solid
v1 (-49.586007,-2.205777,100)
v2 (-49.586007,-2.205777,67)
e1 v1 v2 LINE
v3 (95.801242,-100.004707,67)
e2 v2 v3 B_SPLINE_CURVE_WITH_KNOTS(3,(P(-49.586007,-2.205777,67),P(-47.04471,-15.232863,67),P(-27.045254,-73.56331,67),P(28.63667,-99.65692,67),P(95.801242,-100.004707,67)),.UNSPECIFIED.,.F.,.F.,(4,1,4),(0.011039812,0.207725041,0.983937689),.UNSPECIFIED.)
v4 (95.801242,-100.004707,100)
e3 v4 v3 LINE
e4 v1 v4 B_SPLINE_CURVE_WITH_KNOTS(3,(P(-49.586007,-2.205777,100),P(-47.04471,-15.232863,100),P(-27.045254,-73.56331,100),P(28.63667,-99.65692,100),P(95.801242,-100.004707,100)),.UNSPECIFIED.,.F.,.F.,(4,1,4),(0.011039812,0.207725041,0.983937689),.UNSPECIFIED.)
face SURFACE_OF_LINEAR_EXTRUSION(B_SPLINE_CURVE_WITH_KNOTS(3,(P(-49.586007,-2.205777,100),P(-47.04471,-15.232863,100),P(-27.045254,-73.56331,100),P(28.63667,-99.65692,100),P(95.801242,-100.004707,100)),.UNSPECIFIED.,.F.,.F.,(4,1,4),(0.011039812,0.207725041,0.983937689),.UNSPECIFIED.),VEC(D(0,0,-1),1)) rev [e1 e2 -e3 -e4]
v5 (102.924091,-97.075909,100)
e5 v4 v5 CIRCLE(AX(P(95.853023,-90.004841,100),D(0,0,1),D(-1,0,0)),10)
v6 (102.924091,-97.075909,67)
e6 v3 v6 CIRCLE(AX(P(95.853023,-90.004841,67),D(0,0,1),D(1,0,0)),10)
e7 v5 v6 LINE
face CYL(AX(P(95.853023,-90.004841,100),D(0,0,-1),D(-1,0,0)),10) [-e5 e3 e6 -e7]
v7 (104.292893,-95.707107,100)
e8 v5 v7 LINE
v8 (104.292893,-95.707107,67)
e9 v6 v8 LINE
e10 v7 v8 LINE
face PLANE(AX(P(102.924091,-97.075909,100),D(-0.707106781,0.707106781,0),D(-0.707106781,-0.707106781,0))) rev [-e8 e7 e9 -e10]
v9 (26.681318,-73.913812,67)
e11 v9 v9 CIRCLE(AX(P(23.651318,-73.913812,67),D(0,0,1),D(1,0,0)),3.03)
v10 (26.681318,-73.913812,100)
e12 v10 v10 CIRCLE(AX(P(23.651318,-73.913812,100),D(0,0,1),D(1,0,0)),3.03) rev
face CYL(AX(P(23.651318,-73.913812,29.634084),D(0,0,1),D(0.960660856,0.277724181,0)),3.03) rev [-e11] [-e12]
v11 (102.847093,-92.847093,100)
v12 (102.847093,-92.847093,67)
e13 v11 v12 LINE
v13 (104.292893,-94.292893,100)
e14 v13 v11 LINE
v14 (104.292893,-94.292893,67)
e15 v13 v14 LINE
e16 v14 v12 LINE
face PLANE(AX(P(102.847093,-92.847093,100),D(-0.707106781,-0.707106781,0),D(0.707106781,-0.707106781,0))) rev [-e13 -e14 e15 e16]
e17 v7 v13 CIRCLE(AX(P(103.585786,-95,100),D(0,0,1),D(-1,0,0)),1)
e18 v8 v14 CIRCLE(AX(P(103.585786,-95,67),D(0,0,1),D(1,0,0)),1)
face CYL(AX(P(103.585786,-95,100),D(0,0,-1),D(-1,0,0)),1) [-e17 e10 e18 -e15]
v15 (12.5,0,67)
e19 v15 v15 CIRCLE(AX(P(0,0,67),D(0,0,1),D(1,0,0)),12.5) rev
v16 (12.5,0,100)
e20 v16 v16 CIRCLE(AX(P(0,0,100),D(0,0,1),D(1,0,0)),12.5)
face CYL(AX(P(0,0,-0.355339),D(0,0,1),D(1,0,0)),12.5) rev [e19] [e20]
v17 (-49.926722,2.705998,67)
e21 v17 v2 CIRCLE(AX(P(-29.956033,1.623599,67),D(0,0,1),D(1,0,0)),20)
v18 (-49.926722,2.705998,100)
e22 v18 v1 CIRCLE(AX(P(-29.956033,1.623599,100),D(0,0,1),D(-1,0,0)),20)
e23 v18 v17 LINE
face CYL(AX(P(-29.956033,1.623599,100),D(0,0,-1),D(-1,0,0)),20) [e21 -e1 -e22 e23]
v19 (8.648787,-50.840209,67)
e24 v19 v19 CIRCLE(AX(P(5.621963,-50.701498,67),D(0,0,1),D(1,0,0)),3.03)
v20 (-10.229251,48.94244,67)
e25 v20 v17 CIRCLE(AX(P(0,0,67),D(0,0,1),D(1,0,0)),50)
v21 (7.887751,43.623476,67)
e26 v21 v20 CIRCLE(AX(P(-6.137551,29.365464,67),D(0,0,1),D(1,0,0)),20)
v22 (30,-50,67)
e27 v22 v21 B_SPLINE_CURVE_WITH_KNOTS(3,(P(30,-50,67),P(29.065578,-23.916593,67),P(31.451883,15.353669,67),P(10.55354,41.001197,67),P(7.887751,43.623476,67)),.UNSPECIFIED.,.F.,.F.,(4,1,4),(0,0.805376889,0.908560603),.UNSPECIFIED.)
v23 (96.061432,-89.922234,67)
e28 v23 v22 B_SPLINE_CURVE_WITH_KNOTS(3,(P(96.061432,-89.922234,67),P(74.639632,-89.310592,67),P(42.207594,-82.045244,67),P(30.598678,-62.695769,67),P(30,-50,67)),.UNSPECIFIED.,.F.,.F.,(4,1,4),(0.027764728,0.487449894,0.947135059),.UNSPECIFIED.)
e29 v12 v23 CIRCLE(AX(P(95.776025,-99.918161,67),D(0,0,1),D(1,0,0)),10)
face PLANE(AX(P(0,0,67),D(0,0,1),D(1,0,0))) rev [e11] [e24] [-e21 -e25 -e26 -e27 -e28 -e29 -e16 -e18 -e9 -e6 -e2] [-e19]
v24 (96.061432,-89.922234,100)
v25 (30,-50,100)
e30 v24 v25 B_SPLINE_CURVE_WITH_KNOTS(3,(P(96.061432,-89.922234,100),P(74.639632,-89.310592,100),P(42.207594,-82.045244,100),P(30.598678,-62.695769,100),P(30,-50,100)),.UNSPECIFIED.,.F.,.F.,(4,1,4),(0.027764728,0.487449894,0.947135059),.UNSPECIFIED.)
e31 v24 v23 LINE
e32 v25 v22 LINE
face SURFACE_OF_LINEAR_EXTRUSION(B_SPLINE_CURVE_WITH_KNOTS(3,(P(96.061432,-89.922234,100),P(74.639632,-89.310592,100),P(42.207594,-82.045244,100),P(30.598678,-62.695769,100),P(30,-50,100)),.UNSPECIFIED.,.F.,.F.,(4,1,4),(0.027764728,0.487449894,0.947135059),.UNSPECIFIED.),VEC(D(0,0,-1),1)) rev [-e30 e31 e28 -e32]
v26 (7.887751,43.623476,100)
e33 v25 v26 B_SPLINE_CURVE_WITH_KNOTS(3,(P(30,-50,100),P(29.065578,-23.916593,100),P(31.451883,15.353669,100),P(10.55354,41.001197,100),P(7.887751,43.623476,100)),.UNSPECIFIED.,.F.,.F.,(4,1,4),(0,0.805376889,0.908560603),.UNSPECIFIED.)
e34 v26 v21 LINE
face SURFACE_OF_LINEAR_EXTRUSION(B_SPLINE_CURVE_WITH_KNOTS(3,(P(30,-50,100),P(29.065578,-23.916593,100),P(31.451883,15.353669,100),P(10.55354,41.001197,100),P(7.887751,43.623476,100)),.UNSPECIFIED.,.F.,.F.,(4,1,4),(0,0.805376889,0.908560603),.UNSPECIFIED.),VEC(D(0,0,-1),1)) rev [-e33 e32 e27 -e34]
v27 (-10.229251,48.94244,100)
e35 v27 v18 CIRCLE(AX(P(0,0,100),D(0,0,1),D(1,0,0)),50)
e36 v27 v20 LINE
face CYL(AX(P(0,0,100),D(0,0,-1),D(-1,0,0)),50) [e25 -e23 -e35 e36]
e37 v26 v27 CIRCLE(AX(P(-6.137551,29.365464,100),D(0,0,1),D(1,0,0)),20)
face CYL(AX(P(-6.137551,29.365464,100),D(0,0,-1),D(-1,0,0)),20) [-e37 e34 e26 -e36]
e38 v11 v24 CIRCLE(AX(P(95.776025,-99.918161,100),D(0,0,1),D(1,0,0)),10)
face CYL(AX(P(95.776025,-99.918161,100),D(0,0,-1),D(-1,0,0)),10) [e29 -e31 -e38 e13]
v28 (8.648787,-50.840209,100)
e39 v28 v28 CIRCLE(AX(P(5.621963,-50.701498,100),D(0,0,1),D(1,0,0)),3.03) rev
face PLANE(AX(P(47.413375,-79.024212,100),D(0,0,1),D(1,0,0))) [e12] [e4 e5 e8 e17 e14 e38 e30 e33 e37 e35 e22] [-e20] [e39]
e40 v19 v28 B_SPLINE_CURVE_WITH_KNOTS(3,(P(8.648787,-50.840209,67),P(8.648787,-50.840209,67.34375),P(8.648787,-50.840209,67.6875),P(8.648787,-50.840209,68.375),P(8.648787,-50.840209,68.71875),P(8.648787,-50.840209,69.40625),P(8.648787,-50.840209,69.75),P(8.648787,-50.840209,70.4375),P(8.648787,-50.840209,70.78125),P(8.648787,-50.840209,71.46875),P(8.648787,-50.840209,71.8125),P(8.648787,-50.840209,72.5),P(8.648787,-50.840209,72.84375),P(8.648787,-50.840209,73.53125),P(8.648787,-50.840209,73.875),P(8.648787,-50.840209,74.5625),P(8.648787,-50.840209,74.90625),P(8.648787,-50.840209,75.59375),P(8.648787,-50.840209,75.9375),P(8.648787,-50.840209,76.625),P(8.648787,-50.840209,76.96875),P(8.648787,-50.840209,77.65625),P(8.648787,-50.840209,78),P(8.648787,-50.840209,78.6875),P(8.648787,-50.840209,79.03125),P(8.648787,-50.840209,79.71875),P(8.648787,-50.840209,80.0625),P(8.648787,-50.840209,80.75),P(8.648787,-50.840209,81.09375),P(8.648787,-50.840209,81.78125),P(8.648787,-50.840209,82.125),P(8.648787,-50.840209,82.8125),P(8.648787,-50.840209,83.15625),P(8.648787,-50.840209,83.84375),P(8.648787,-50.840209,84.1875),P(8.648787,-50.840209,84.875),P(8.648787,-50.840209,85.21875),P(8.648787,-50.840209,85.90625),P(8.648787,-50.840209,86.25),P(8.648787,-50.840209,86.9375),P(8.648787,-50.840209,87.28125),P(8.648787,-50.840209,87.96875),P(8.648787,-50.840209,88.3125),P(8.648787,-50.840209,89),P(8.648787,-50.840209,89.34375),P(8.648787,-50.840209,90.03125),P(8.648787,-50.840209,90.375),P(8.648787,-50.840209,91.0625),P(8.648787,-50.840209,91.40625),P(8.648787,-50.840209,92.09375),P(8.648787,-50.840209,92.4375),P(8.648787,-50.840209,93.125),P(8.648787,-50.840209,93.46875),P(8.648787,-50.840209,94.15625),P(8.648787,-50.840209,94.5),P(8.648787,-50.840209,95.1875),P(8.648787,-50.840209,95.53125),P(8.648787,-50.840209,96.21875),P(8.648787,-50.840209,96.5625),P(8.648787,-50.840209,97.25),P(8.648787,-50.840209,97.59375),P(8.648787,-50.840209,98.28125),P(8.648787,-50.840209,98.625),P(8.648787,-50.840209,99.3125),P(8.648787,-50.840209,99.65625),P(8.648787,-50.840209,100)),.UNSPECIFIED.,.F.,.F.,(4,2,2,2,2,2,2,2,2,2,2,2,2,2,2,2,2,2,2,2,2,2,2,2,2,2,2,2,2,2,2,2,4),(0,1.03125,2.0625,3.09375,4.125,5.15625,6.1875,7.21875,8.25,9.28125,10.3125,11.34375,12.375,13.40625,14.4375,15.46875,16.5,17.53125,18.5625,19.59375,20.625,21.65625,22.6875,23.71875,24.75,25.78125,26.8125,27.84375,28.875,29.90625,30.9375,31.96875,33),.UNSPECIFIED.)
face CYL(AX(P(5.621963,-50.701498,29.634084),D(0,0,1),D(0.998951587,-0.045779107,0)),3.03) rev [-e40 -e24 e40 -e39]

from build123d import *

# Parameters (mm, degrees)
CROQUIS1_R              = 10
SALIENTE_EXTRUIR1_DEPTH = 100
CORTAR_EXTRUIR4_DEPTH   = 15
CROQUIS3_W              = 244.799963401
CROQUIS3_H              = 159.784694376
CORTAR_EXTRUIR5_DEPTH   = 35
CAVIDAD1_START          = 35
CAVIDAD1_OUTLINE_R      = 3.03
CAVIDAD1_DEPTH          = 65
CROQUIS4_R              = 12.5
CORTAR_EXTRUIR6_DEPTH   = 65
CROQUIS5_W              = 213.058099932
CROQUIS5_H              = 195.665601979
CORTAR_EXTRUIR7_DEPTH   = 32


# Read off the part's stored shape, not the designer's step: Cavidad1
with BuildPart() as part:
    # Croquis1 → Saliente-Extruir1 (new body)
    with BuildSketch(Plane.XY):
        with BuildLine():
            Line((102.84709295, -92.84709295), (104.292893219, -94.292893219))
            ThreePointArc((104.292893219, -94.292893219), (104.585786438, -95), (104.292893219, -95.707106781))
            Line((104.292893219, -95.707106781), (102.924090823, -97.075909177))
            ThreePointArc((102.924090823, -97.075909177), (99.655924863, -99.253513567), (95.801242309, -100.004707302))
            add(Edge.make_bspline(
                [(-49.58600728, -2.205776949), (-47.044709507, -15.23286343), (-27.045253615, -73.563310407), (28.636670051, -99.656919769), (95.801242309, -100.004707302)],
                knots=[0.011039812, 0.011039812, 0.011039812, 0.011039812, 0.207725041, 0.983937689, 0.983937689, 0.983937689, 0.983937689], degree=3))
            ThreePointArc((-49.58600728, -2.205776949), (-49.90808847, 0.239585929), (-49.92672205, 2.705998037))
            ThreePointArc((-49.92672205, 2.705998037), (-37.935964584, 32.570885635), (-10.229250857, 48.942439936))
            ThreePointArc((-10.229250857, 48.942439936), (-0.503550938, 48.555514737), (7.88775097, 43.623476385))
            add(Edge.make_bspline(
                [(30, -50), (29.065577858, -23.91659264), (31.451883129, 15.353668912), (10.5535399, 41.001196903), (7.88775097, 43.623476385)],
                knots=[0, 0, 0, 0, 0.805376889, 0.908560603, 0.908560603, 0.908560603, 0.908560603], degree=3))
            add(Edge.make_bspline(
                [(96.061432126, -89.922234449), (74.639632489, -89.310592156), (42.207594165, -82.045244121), (30.598677739, -62.69576919), (30, -50)],
                knots=[0.027764728, 0.027764728, 0.027764728, 0.027764728, 0.487449894, 0.947135059, 0.947135059, 0.947135059, 0.947135059], degree=3))
            ThreePointArc((96.061432126, -89.922234449), (99.734323975, -90.734922209), (102.84709295, -92.84709295))
        make_face()
        Circle(CROQUIS1_R, mode=Mode.SUBTRACT)
    extrude(amount=SALIENTE_EXTRUIR1_DEPTH)

    # Croquis2 → Cortar-Extruir4 (cut)
    with BuildSketch(Plane(origin=(0, 0, 0), x_dir=(-1, 0, 0), z_dir=(0, 0, -1))):
        with BuildLine():
            ThreePointArc((1.102623365, 39.984799883), (1.653330869, 39.965816607), (2.203724614, 39.939248839))
            ThreePointArc((2.203724614, 39.939248839), (3.208029629, 37.678468026), (3.853201686, 35.290265468))
            ThreePointArc((3.853201686, 35.290265468), (4.391380959, 35.227344113), (4.928537187, 35.156215968))
            ThreePointArc((4.928537187, 35.156215968), (6.140272041, 37.312939662), (7.668866774, 39.257973488))
            ThreePointArc((7.668866774, 39.257973488), (8.208938801, 39.148605643), (8.747452981, 39.031808392))
            ThreePointArc((8.747452981, 39.031808392), (9.365948293, 36.63655851), (9.609235823, 34.174736091))
            ThreePointArc((9.609235823, 34.174736091), (10.129718517, 34.024091505), (10.647841327, 33.865520446))
            ThreePointArc((10.647841327, 33.865520446), (12.198034749, 35.793384238), (14.025923488, 37.460291914))
            ThreePointArc((14.025923488, 37.460291914), (14.540628281, 37.263522769), (15.052573634, 37.05968196))
            ThreePointArc((15.052573634, 37.05968196), (15.268388303, 34.595299183), (15.103155055, 32.127009001))
            ThreePointArc((15.103155055, 32.127009001), (15.591743761, 31.892750375), (16.076700112, 31.651061807))
            ThreePointArc((16.076700112, 31.651061807), (17.923066867, 33.297478598), (20.000389573, 34.640791229))
            ThreePointArc((20.000389573, 34.640791229), (20.475687326, 34.361988134), (20.947099317, 34.076664012))
            ThreePointArc((20.947099317, 34.076664012), (20.754346482, 31.610370276), (20.18509959, 29.202940855))
            ThreePointArc((20.18509959, 29.202940855), (20.628466879, 28.891458153), (21.067028427, 28.57324471))
            ThreePointArc((21.067028427, 28.57324471), (23.159204443, 29.893304542), (25.429297167, 30.87638006))
            ThreePointArc((25.429297167, 30.87638006), (25.852222997, 30.523148037), (26.270242736, 30.164123501))
            ThreePointArc((26.270242736, 30.164123501), (25.674180192, 27.763192871), (24.716447225, 25.482292608))
            ThreePointArc((24.716447225, 25.482292608), (25.102499195, 25.102082267), (25.482703124, 24.716023982))
            ThreePointArc((25.482703124, 24.716023982), (27.763619294, 25.673719065), (30.164559823, 26.269741732))
            ThreePointArc((30.164559823, 26.269741732), (30.523577417, 25.85171603), (30.876802415, 25.428784332))
            ThreePointArc((30.876802415, 25.428784332), (29.893689193, 23.158707937), (28.573594612, 21.066553846))
            ThreePointArc((28.573594612, 21.066553846), (28.891800771, 20.627987013), (29.203276108, 20.18461455))
            ThreePointArc((29.203276108, 20.18461455), (31.610714984, 20.753821458), (34.077011921, 20.94653333))
            ThreePointArc((34.077011921, 20.94653333), (34.362328213, 20.4751166), (34.641123413, 19.999814215))
            ThreePointArc((34.641123413, 19.999814215), (33.297776281, 17.922513822), (31.651328823, 16.076174412))
            ThreePointArc((31.651328823, 16.076174412), (31.893009337, 15.591214047), (32.127259848, 15.102621451))
            ThreePointArc((32.127259848, 15.102621451), (34.595552773, 15.267813702), (37.059931966, 15.051958102))
            ThreePointArc((37.059931966, 15.051958102), (37.263764272, 14.540009363), (37.460524868, 14.025301302))
            ThreePointArc((37.460524868, 14.025301302), (35.793586832, 12.197440249), (33.865697293, 10.647278847))
            ThreePointArc((33.865697293, 10.647278847), (34.024259747, 10.129153404), (34.174895688, 9.608668207))
            ThreePointArc((34.174895688, 9.608668207), (36.636714066, 9.365339789), (39.031953674, 8.746804694))
            ThreePointArc((39.031953674, 8.746804694), (39.148741981, 8.208288574), (39.258100856, 7.668214731))
            ThreePointArc((39.258100856, 7.668214731), (37.313041641, 6.139652303), (35.156297822, 4.927953271))
            ThreePointArc((35.156297822, 4.927953271), (35.227417046, 4.390795861), (35.290329461, 3.852615543))
            ThreePointArc((35.290329461, 3.852615543), (37.678521304, 3.20740382), (39.939285436, 2.203061256))
            ThreePointArc((39.939285436, 2.203061256), (39.965844062, 1.65266707), (39.984818192, 1.101959251))
            ThreePointArc((39.984818192, 1.101959251), (37.814693942, -0.085609353), (35.487926192, -0.925794025))
            ThreePointArc((35.487926192, -0.925794025), (35.469662238, -1.467331147), (35.443135042, -2.00852643))
            ThreePointArc((35.443135042, -2.00852643), (37.692556701, -3.038021764), (39.757177604, -4.400775951))
            ThreePointArc((39.757177604, -4.400775951), (39.692782099, -4.948034883), (39.620853919, -5.494354805))
            ThreePointArc((39.620853919, -5.494354805), (37.284859968, -6.308535809), (34.851536446, -6.754288072))
            ThreePointArc((34.851536446, -6.754288072), (34.744387508, -7.285433186), (34.629144292, -7.814881038))
            ThreePointArc((34.629144292, -7.814881038), (36.678437409, -9.200578033), (38.490597607, -10.884571461))
            ThreePointArc((38.490597607, -10.884571461), (38.337004513, -11.413767343), (38.176136036, -11.940797184))
            ThreePointArc((38.176136036, -11.940797184), (35.737992209, -12.359381853), (33.264487636, -12.398542748))
            ThreePointArc((33.264487636, -12.398542748), (33.071376458, -12.904807599), (32.870560757, -13.408066063))
            ThreePointArc((32.870560757, -13.408066063), (34.663825958, -15.112166519), (36.174094444, -17.071464236))
            ThreePointArc((36.174094444, -17.071464236), (35.935493381, -17.568161984), (35.690072679, -18.061525743))
            ThreePointArc((35.690072679, -18.061525743), (33.216285184, -18.073096179), (30.770070318, -17.704597499))
            ThreePointArc((30.770070318, -17.704597499), (30.496264469, -18.172172502), (30.215354012, -18.635513998))
            ThreePointArc((30.215354012, -18.635513998), (31.703675696, -20.611534496), (32.870856284, -22.792691969))
            ThreePointArc((32.870856284, -22.792691969), (32.553755666, -23.243342962), (32.230477177, -23.689582963))
            ThreePointArc((32.230477177, -23.689582963), (29.788524487, -23.293823554), (27.436325694, -22.527716982))
            ThreePointArc((27.436325694, -22.527716982), (27.089293883, -22.94384791), (26.735951175, -23.35463369))
            ThreePointArc((26.735951175, -23.35463369), (27.878731807, -25.548673542), (28.670986852, -27.89219448))
            ThreePointArc((28.670986852, -27.89219448), (28.284036357, -28.284506136), (27.891718275, -28.671450114))
            ThreePointArc((27.891718275, -28.671450114), (25.548210496, -27.879156145), (23.354189625, -26.736339072))
            ThreePointArc((23.354189625, -26.736339072), (22.943397976, -27.089674957), (22.527261285, -27.436699856))
            ThreePointArc((22.527261285, -27.436699856), (23.293328789, -29.788911374), (23.689047639, -32.230870636))
            ThreePointArc((23.689047639, -32.230870636), (23.242802268, -32.554141714), (22.792146008, -32.871234847))
            ThreePointArc((22.792146008, -32.871234847), (20.611007921, -31.704018032), (18.635012143, -30.215663528))
            ThreePointArc((18.635012143, -30.215663528), (18.171665982, -30.496566289), (17.704086432, -30.770364373))
            ThreePointArc((17.704086432, -30.770364373), (18.072544482, -33.216585358), (18.060932958, -35.690372661))
            ThreePointArc((18.060932958, -35.690372661), (17.567565123, -35.935785168), (17.070863412, -36.174377982))
            ThreePointArc((17.070863412, -36.174377982), (15.111590779, -34.664076954), (13.407520108, -32.870783449))
            ThreePointArc((13.407520108, -32.870783449), (12.90425831, -33.071590791), (12.397990251, -33.264693561))
            ThreePointArc((12.397990251, -33.264693561), (12.358788274, -35.738197483), (11.940163108, -38.176334357))
            ThreePointArc((11.940163108, -38.176334357), (11.413130596, -38.337194081), (10.883932163, -38.490778385))
            ThreePointArc((10.883932163, -38.490778385), (9.199968834, -36.678590218), (7.814305875, -34.629274085))
            ThreePointArc((7.814305875, -34.629274085), (7.28485611, -34.744508508), (6.753709216, -34.851648624))
            ThreePointArc((6.753709216, -34.851648624), (6.307916538, -37.284964743), (5.493696735, -39.62094517))
            ThreePointArc((5.493696735, -39.62094517), (4.947375618, -39.692864277), (4.400115616, -39.757250692))
            ThreePointArc((4.400115616, -39.757250692), (3.037395721, -37.692607155), (2.007937749, -35.443168397))
            ThreePointArc((2.007937749, -35.443168397), (1.466742025, -35.469686605), (0.9252046, -35.487941564))
            ThreePointArc((0.9252046, -35.487941564), (0.084981283, -37.814695359), (-1.102623365, -39.984799883))
            ThreePointArc((-1.102623365, -39.984799883), (-1.653330869, -39.965816607), (-2.203724614, -39.939248839))
            ThreePointArc((-2.203724614, -39.939248839), (-3.208029629, -37.678468026), (-3.853201686, -35.290265468))
            ThreePointArc((-3.853201686, -35.290265468), (-4.391380959, -35.227344113), (-4.928537187, -35.156215968))
            ThreePointArc((-4.928537187, -35.156215968), (-6.140272041, -37.312939662), (-7.668866774, -39.257973488))
            ThreePointArc((-7.668866774, -39.257973488), (-8.208938801, -39.148605643), (-8.747452981, -39.031808392))
            ThreePointArc((-8.747452981, -39.031808392), (-9.365948293, -36.63655851), (-9.609235823, -34.174736091))
            ThreePointArc((-9.609235823, -34.174736091), (-10.129718517, -34.024091505), (-10.647841327, -33.865520446))
            ThreePointArc((-10.647841327, -33.865520446), (-12.198034749, -35.793384238), (-14.025923488, -37.460291914))
            ThreePointArc((-14.025923488, -37.460291914), (-14.540628281, -37.263522769), (-15.052573634, -37.05968196))
            ThreePointArc((-15.052573634, -37.05968196), (-15.268388303, -34.595299183), (-15.103155055, -32.127009001))
            ThreePointArc((-15.103155055, -32.127009001), (-15.591743761, -31.892750375), (-16.076700112, -31.651061807))
            ThreePointArc((-16.076700112, -31.651061807), (-17.923066867, -33.297478598), (-20.000389573, -34.640791229))
            ThreePointArc((-20.000389573, -34.640791229), (-20.475687326, -34.361988134), (-20.947099317, -34.076664012))
            ThreePointArc((-20.947099317, -34.076664012), (-20.754346482, -31.610370276), (-20.18509959, -29.202940855))
            ThreePointArc((-20.18509959, -29.202940855), (-20.628466879, -28.891458153), (-21.067028427, -28.57324471))
            ThreePointArc((-21.067028427, -28.57324471), (-23.159204443, -29.893304542), (-25.429297167, -30.87638006))
            ThreePointArc((-25.429297167, -30.87638006), (-25.852222997, -30.523148037), (-26.270242736, -30.164123501))
            ThreePointArc((-26.270242736, -30.164123501), (-25.674180192, -27.763192871), (-24.716447225, -25.482292608))
            ThreePointArc((-24.716447225, -25.482292608), (-25.102499195, -25.102082267), (-25.482703124, -24.716023982))
            ThreePointArc((-25.482703124, -24.716023982), (-27.421409872, -25.555856409), (-29.453588357, -26.133916065))
            add(Edge.make_bspline(
                [(-30, -50), (-29.734872846, -42.599255467), (-29.715262914, -34.495945215), (-29.453588357, -26.133916065)],
                knots=[0, 0, 0, 0, 0.228512653, 0.228512653, 0.228512653, 0.228512653], degree=3))
            add(Edge.make_bspline(
                [(-96.061432126, -89.922234449), (-74.639632489, -89.310592156), (-42.207594165, -82.045244121), (-30.598677739, -62.69576919), (-30, -50)],
                knots=[0.027764728, 0.027764728, 0.027764728, 0.027764728, 0.487449894, 0.947135059, 0.947135059, 0.947135059, 0.947135059], degree=3))
            ThreePointArc((-96.061432126, -89.922234449), (-99.734323975, -90.734922209), (-102.84709295, -92.84709295))
            Line((-102.84709295, -92.84709295), (-104.292893219, -94.292893219))
            ThreePointArc((-104.292893219, -94.292893219), (-104.585786438, -95), (-104.292893219, -95.707106781))
            Line((-104.292893219, -95.707106781), (-102.924090823, -97.075909177))
            ThreePointArc((-102.924090823, -97.075909177), (-99.655924863, -99.253513567), (-95.801242309, -100.004707302))
            add(Edge.make_bspline(
                [(49.58600728, -2.205776949), (47.044709507, -15.23286343), (27.045253615, -73.563310407), (-28.636670051, -99.656919769), (-95.801242309, -100.004707302)],
                knots=[0.011039812, 0.011039812, 0.011039812, 0.011039812, 0.207725041, 0.983937689, 0.983937689, 0.983937689, 0.983937689], degree=3))
            ThreePointArc((49.58600728, -2.205776949), (49.90808847, 0.239585929), (49.92672205, 2.705998037))
            ThreePointArc((49.92672205, 2.705998037), (37.935964584, 32.570885635), (10.229250857, 48.942439936))
            ThreePointArc((10.229250857, 48.942439936), (0.503550938, 48.555514737), (-7.88775097, 43.623476385))
            add(Edge.make_bspline(
                [(-15.182020199, 34.727214957), (-15.121605489, 34.818294405), (-12.99668952, 38.002837294), (-10.5535399, 41.001196903), (-7.88775097, 43.623476385)],
                knots=[0.802344073, 0.802344073, 0.802344073, 0.802344073, 0.805376889, 0.908560603, 0.908560603, 0.908560603, 0.908560603], degree=3))
            ThreePointArc((-15.182020199, 34.727214957), (-14.257602386, 33.834526615), (-13.407520108, 32.870783449))
            ThreePointArc((-13.407520108, 32.870783449), (-12.90425831, 33.071590791), (-12.397990251, 33.264693561))
            ThreePointArc((-12.397990251, 33.264693561), (-12.358788274, 35.738197483), (-11.940163108, 38.176334357))
            ThreePointArc((-11.940163108, 38.176334357), (-11.413130596, 38.337194081), (-10.883932163, 38.490778385))
            ThreePointArc((-10.883932163, 38.490778385), (-9.199968834, 36.678590218), (-7.814305875, 34.629274085))
            ThreePointArc((-7.814305875, 34.629274085), (-7.28485611, 34.744508508), (-6.753709216, 34.851648624))
            ThreePointArc((-6.753709216, 34.851648624), (-6.307916538, 37.284964743), (-5.493696735, 39.62094517))
            ThreePointArc((-5.493696735, 39.62094517), (-4.947375618, 39.692864277), (-4.400115616, 39.757250692))
            ThreePointArc((-4.400115616, 39.757250692), (-3.037395721, 37.692607155), (-2.007937749, 35.443168397))
            ThreePointArc((-2.007937749, 35.443168397), (-1.466742025, 35.469686605), (-0.9252046, 35.487941564))
            ThreePointArc((-0.9252046, 35.487941564), (-0.084981283, 37.814695359), (1.102623365, 39.984799883))
        make_face()
    extrude(amount=-CORTAR_EXTRUIR4_DEPTH, mode=Mode.SUBTRACT)

    # Croquis3 → Cortar-Extruir5 (cut)
    with BuildSketch(Plane(origin=(0, 0, 0), x_dir=(-1, 0, 0), z_dir=(0, 0, -1))):
        with Locations((-26.261343778, -29.231181028)):
            Rectangle(CROQUIS3_W, CROQUIS3_H)
    extrude(amount=-CORTAR_EXTRUIR5_DEPTH, mode=Mode.SUBTRACT)

    # Cavidad1 outline → Cavidad1 (cut)
    with BuildSketch(Plane.XY.offset(CAVIDAD1_START)):
        with Locations((23.651318082, -73.91381178)):
            Circle(CAVIDAD1_OUTLINE_R)
        with Locations((5.62196341, -50.701498074)):
            Circle(CAVIDAD1_OUTLINE_R)
    extrude(amount=CAVIDAD1_DEPTH, mode=Mode.SUBTRACT)

    # Croquis4 → Cortar-Extruir6 (cut)
    with BuildSketch(Plane.XY.offset(100)):
        Circle(CROQUIS4_R)
    extrude(amount=-CORTAR_EXTRUIR6_DEPTH, mode=Mode.SUBTRACT)

    # Croquis5 → Cortar-Extruir7 (cut)
    with BuildSketch(Plane(origin=(7.88775097, 43.623476385, 35), x_dir=(-1, 0, 0), z_dir=(0, 0, -1))):
        with Locations((-26.613557115, -76.115750781)):
            Rectangle(CROQUIS5_W, CROQUIS5_H)
    extrude(amount=-CORTAR_EXTRUIR7_DEPTH, mode=Mode.SUBTRACT)


solid = part.part
